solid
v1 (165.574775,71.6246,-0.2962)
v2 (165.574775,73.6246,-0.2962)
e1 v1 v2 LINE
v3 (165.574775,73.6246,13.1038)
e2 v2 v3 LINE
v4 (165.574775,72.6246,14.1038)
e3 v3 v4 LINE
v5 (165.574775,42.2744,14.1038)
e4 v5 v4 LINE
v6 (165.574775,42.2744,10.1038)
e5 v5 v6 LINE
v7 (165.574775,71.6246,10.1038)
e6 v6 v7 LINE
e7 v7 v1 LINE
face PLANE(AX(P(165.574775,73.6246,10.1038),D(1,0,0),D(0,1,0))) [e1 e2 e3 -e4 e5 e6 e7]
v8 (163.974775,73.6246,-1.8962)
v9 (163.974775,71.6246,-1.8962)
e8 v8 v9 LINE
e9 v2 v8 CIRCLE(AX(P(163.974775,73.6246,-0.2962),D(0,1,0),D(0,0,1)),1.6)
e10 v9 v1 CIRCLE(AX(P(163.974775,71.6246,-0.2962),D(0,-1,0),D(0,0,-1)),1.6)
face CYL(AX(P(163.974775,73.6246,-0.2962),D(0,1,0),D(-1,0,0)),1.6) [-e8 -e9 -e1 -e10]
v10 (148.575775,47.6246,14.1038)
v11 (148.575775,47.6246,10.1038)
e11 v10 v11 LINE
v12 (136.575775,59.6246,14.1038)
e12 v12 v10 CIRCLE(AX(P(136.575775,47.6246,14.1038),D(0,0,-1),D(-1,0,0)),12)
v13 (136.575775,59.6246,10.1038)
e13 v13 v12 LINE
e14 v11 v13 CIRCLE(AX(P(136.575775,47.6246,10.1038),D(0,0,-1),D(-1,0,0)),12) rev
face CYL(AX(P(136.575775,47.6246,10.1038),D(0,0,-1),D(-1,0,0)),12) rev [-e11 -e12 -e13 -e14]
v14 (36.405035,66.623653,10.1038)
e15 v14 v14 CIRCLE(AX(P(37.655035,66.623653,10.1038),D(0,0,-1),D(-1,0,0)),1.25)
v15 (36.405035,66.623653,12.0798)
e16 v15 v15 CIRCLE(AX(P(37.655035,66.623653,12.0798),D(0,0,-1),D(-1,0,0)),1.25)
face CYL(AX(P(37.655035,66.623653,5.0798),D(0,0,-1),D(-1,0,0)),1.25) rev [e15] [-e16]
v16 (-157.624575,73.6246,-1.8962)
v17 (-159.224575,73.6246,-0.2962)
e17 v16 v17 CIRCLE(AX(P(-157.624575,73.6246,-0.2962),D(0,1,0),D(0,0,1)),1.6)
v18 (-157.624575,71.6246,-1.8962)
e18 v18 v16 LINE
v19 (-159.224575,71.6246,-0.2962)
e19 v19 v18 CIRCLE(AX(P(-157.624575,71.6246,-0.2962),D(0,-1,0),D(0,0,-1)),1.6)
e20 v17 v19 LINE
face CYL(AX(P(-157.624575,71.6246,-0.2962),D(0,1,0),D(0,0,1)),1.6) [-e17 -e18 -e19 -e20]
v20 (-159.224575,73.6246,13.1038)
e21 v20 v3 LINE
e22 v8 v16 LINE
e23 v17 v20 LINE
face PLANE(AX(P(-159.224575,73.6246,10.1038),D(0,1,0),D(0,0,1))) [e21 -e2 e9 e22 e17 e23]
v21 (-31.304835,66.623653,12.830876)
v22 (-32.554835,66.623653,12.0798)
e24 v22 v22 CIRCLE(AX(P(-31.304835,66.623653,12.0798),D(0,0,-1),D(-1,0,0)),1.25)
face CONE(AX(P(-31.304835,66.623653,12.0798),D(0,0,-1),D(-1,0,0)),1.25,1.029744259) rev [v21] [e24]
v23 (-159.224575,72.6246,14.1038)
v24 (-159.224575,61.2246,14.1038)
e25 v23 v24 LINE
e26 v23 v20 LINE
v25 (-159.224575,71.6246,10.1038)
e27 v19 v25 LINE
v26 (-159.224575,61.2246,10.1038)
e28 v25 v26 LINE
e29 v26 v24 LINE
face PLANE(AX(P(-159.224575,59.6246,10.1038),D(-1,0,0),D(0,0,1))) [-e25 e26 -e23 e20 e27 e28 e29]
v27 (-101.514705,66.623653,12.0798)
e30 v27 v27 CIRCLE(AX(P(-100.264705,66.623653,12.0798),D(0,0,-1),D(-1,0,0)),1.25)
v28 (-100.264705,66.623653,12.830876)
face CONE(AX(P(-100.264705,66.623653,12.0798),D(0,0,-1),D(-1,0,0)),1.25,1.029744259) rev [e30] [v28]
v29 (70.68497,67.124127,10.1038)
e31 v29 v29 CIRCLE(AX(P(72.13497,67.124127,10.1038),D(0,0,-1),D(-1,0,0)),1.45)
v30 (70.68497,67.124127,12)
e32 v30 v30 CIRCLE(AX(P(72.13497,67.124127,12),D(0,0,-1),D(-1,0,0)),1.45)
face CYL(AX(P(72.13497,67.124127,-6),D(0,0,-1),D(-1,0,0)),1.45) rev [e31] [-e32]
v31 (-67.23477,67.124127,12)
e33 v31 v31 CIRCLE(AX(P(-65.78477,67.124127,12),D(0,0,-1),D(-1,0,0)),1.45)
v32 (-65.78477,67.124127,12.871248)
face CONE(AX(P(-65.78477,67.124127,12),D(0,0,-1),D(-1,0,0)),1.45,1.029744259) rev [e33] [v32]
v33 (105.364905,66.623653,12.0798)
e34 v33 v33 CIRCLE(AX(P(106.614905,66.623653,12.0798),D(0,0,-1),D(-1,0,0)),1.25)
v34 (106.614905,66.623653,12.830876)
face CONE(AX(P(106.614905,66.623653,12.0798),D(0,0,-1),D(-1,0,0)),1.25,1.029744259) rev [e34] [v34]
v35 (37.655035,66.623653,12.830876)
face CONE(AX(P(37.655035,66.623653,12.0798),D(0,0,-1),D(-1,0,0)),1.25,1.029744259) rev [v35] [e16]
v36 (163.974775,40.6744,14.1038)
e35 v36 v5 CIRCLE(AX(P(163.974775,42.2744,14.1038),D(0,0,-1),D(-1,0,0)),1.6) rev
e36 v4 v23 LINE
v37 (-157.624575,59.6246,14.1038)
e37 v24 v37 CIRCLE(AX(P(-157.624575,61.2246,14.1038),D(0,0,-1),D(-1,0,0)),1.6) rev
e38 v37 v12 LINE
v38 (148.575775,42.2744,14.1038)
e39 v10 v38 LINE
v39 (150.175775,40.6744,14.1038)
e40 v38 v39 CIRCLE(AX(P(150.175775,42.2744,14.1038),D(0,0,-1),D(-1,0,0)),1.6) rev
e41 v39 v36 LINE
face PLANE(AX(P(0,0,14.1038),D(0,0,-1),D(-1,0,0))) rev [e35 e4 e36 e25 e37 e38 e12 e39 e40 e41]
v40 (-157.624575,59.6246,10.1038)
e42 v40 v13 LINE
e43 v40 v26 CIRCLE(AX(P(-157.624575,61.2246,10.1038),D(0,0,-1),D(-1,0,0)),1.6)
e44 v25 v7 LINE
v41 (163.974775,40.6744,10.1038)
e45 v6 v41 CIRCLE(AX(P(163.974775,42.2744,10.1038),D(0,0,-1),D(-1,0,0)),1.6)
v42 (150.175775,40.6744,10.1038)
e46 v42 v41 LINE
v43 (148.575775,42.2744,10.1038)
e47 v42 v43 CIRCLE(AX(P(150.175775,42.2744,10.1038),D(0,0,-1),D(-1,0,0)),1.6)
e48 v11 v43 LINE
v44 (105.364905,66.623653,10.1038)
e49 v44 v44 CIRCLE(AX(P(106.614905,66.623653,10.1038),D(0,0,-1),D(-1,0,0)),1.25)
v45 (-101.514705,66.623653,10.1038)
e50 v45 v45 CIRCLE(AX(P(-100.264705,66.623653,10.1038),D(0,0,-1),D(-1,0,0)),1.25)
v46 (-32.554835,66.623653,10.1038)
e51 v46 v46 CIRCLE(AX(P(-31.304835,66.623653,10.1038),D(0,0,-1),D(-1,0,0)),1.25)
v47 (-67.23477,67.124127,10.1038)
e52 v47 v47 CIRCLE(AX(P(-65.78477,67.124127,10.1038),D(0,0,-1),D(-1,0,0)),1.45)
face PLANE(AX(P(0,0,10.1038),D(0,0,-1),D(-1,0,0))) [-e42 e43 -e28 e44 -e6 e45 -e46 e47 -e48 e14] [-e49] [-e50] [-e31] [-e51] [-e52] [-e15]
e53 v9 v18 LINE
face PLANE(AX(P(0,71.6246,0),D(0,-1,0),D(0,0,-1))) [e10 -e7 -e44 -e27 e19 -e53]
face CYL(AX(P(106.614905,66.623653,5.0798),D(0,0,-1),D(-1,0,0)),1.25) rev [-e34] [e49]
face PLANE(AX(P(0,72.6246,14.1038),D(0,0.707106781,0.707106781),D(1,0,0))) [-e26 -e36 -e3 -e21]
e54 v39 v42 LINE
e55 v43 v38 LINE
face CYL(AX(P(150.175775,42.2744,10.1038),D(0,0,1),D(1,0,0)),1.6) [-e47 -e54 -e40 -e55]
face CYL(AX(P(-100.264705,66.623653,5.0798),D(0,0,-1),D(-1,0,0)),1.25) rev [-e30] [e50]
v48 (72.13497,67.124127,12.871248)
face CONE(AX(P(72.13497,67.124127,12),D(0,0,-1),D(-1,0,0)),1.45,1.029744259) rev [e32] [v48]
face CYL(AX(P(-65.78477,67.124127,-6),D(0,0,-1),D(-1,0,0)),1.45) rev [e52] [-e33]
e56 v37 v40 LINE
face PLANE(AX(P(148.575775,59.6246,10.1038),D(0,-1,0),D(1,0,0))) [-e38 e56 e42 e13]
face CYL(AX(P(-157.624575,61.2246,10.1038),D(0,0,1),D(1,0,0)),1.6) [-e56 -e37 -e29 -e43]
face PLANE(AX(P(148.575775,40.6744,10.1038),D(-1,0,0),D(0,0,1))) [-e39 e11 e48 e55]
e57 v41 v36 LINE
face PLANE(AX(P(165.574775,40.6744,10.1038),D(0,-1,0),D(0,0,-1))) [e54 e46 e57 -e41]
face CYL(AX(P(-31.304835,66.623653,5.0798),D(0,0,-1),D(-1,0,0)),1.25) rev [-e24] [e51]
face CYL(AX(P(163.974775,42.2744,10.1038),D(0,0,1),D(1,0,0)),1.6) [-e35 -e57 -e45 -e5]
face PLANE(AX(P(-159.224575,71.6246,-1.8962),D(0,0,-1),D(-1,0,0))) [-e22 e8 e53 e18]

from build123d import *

# Parameters (mm, degrees)
BOSS_EXTRUDE1_DEPTH                          = 4
SKETCH3_W                                    = 324.79935
SKETCH3_H                                    = 12
BOSS_EXTRUDE2_DEPTH                          = 2
FILLET1_SIZE                                 = 1
FILLET2_R                                    = 1.6
FILLET3_R                                    = 12
TAP_DRILL_FOR_M3X0_5_TAP1_D                  = 2.5
TAP_DRILL_FOR_M3X0_5_TAP1_DEPTH              = 7
TAP_DRILL_FOR_M3X0_5_TAP1_CSINK_D            = 2.55
TAP_DRILL_FOR_M3X0_5_TAP1_CSINK_ANGLE        = 90
TAP_DRILL_FOR_M3X0_5_TAP1_TIP                = 0.751075774
CBORE_FOR_M2_5_HEX_SOCKET_HEAD_CAP_S_2_COUNT = 2
CBORE_FOR_M2_5_HEX_SOCKET_HEAD_CAP_S_2_PITCH = 343.798403
CBORE_FOR_M2_5_HEX_SOCKET_HEAD_CAP_S_3_COUNT = 2
CBORE_FOR_M2_5_HEX_SOCKET_HEAD_CAP_S_3_PITCH = 369.079907741
CBORE_FOR_M2_5_HEX_SOCKET_HEAD_CAP_S_4_COUNT = 2
CBORE_FOR_M2_5_HEX_SOCKET_HEAD_CAP_S_4_PITCH = 275.745768266
CBORE_FOR_M2_5_HEX_SOCKET_HEAD_CAP_S_5_COUNT = 2
CBORE_FOR_M2_5_HEX_SOCKET_HEAD_CAP_S_5_PITCH = 169.171931368
CBORE_FOR_M2_5_HEX_SOCKET_HEAD_CAP_S_6_COUNT = 2
CBORE_FOR_M2_5_HEX_SOCKET_HEAD_CAP_S_6_PITCH = 134.248413


with BuildPart() as part:
    # Sketch2 → Boss-Extrude1 (new body)
    with BuildSketch(Plane.XY.offset(14.1038)):
        Polygon((-159.224575, 59.6246), (-159.224575, 73.6246), (165.574775, 73.6246), (165.574775, 59.6246), (165.574775, 40.6744), (148.575775, 40.6744), (148.575775, 59.6246), align=None)
    extrude(amount=-BOSS_EXTRUDE1_DEPTH)

    # Sketch3 → Boss-Extrude2 (add)
    with BuildSketch(Plane(origin=(0, 73.6246, 0), x_dir=(1, 0, 0), z_dir=(0, 1, 0))):
        with Locations((3.1751, -4.1038)):
            Rectangle(SKETCH3_W, SKETCH3_H)
    extrude(amount=-BOSS_EXTRUDE2_DEPTH)

    # Fillet1
    fillet1_edges = [part.edges().sort_by_distance(p)[0] for p in [
        (3.1751, 73.6246, 14.1038),
    ]]
    chamfer(fillet1_edges, length=FILLET1_SIZE)

    # Fillet2
    fillet2_edges = [part.edges().sort_by_distance(p)[0] for p in [
        (165.574775, 40.6744, 12.1038),
        (148.575775, 40.6744, 12.1038),
        (-159.224575, 59.6246, 12.1038),
        (165.574775, 72.6246, -1.8962),
        (-159.224575, 72.6246, -1.8962),
    ]]
    fillet(fillet2_edges, radius=FILLET2_R)

    # Fillet3
    fillet3_edges = [part.edges().sort_by_distance(p)[0] for p in [
        (148.575775, 59.6246, 12.1038),
    ]]
    fillet(fillet3_edges, radius=FILLET3_R)

    # Tap Drill for M3x0.5 Tap1
    with Locations(Plane(origin=(0, 0, 5.0798), x_dir=(-1, 0, 0), z_dir=(0, 0, -1))):
        with Locations((-106.614905, 66.623653), (-37.655035, 66.623653), (31.304835, 66.623653), (100.264705, 66.623653), (100.264705, -66.62476), (31.304835, -66.62476), (-37.655035, -66.62476), (-106.614905, -66.62476)):
            CounterSinkHole(TAP_DRILL_FOR_M3X0_5_TAP1_D / 2, TAP_DRILL_FOR_M3X0_5_TAP1_CSINK_D / 2, depth=TAP_DRILL_FOR_M3X0_5_TAP1_DEPTH, counter_sink_angle=TAP_DRILL_FOR_M3X0_5_TAP1_CSINK_ANGLE)
            with Locations((0, 0, -(TAP_DRILL_FOR_M3X0_5_TAP1_DEPTH + TAP_DRILL_FOR_M3X0_5_TAP1_TIP / 2))):  # 118° drill point
                Cone(0, TAP_DRILL_FOR_M3X0_5_TAP1_D / 2, TAP_DRILL_FOR_M3X0_5_TAP1_TIP, mode=Mode.SUBTRACT)

    # Sketch7 → CBORE for M2.5 Hex Socket Head Cap Screw1 (revolve, cut)
    with BuildSketch(Plane(origin=(-168.7241015, -67.1242865, -6), x_dir=(0, 1, 0), z_dir=(1, 0, 0))):
        Polygon((0, 0), (0, 18.871247898), (1.45, 18), (1.45, 5.9), (2.75, 5.9), (2.75, 0.025), (2.775, 0), align=None)
    cbore_for_m2_5_hex_socket_head_cap_screw = revolve(axis=Axis((-168.7241015, -67.1242865, -12.35), (0, 0, 1)), mode=Mode.SUBTRACT)

    # CBORE for M2.5 Hex Socket Head Cap S 2: CBORE for M2.5 Hex Socket Head Cap Screw1 ×2
    with Locations(*[(i * CBORE_FOR_M2_5_HEX_SOCKET_HEAD_CAP_S_2_PITCH, 0, 0) for i in range(1, CBORE_FOR_M2_5_HEX_SOCKET_HEAD_CAP_S_2_COUNT)]):
        add(cbore_for_m2_5_hex_socket_head_cap_screw, mode=Mode.SUBTRACT)

    # CBORE for M2.5 Hex Socket Head Cap S 3: CBORE for M2.5 Hex Socket Head Cap Screw1 ×2
    with Locations(*[Vector(0.9315012705620509, 0.3637380691394355, 0) * (i * CBORE_FOR_M2_5_HEX_SOCKET_HEAD_CAP_S_3_PITCH) for i in range(1, CBORE_FOR_M2_5_HEX_SOCKET_HEAD_CAP_S_3_COUNT)]):
        add(cbore_for_m2_5_hex_socket_head_cap_screw, mode=Mode.SUBTRACT)

    # CBORE for M2.5 Hex Socket Head Cap S 4: CBORE for M2.5 Hex Socket Head Cap Screw1 ×2
    with Locations(*[Vector(0.873482385656236, 0.48685575065751296, 0) * (i * CBORE_FOR_M2_5_HEX_SOCKET_HEAD_CAP_S_4_PITCH) for i in range(1, CBORE_FOR_M2_5_HEX_SOCKET_HEAD_CAP_S_4_COUNT)]):
        add(cbore_for_m2_5_hex_socket_head_cap_screw, mode=Mode.SUBTRACT)

    # CBORE for M2.5 Hex Socket Head Cap S 5: CBORE for M2.5 Hex Socket Head Cap Screw1 ×2
    with Locations(*[Vector(0.6084894265127476, 0.7935619810841417, 0) * (i * CBORE_FOR_M2_5_HEX_SOCKET_HEAD_CAP_S_5_PITCH) for i in range(1, CBORE_FOR_M2_5_HEX_SOCKET_HEAD_CAP_S_5_COUNT)]):
        add(cbore_for_m2_5_hex_socket_head_cap_screw, mode=Mode.SUBTRACT)

    # CBORE for M2.5 Hex Socket Head Cap S 6: CBORE for M2.5 Hex Socket Head Cap Screw1 ×2
    with Locations(*[(0, i * CBORE_FOR_M2_5_HEX_SOCKET_HEAD_CAP_S_6_PITCH, 0) for i in range(1, CBORE_FOR_M2_5_HEX_SOCKET_HEAD_CAP_S_6_COUNT)]):
        add(cbore_for_m2_5_hex_socket_head_cap_screw, mode=Mode.SUBTRACT)


solid = part.part
